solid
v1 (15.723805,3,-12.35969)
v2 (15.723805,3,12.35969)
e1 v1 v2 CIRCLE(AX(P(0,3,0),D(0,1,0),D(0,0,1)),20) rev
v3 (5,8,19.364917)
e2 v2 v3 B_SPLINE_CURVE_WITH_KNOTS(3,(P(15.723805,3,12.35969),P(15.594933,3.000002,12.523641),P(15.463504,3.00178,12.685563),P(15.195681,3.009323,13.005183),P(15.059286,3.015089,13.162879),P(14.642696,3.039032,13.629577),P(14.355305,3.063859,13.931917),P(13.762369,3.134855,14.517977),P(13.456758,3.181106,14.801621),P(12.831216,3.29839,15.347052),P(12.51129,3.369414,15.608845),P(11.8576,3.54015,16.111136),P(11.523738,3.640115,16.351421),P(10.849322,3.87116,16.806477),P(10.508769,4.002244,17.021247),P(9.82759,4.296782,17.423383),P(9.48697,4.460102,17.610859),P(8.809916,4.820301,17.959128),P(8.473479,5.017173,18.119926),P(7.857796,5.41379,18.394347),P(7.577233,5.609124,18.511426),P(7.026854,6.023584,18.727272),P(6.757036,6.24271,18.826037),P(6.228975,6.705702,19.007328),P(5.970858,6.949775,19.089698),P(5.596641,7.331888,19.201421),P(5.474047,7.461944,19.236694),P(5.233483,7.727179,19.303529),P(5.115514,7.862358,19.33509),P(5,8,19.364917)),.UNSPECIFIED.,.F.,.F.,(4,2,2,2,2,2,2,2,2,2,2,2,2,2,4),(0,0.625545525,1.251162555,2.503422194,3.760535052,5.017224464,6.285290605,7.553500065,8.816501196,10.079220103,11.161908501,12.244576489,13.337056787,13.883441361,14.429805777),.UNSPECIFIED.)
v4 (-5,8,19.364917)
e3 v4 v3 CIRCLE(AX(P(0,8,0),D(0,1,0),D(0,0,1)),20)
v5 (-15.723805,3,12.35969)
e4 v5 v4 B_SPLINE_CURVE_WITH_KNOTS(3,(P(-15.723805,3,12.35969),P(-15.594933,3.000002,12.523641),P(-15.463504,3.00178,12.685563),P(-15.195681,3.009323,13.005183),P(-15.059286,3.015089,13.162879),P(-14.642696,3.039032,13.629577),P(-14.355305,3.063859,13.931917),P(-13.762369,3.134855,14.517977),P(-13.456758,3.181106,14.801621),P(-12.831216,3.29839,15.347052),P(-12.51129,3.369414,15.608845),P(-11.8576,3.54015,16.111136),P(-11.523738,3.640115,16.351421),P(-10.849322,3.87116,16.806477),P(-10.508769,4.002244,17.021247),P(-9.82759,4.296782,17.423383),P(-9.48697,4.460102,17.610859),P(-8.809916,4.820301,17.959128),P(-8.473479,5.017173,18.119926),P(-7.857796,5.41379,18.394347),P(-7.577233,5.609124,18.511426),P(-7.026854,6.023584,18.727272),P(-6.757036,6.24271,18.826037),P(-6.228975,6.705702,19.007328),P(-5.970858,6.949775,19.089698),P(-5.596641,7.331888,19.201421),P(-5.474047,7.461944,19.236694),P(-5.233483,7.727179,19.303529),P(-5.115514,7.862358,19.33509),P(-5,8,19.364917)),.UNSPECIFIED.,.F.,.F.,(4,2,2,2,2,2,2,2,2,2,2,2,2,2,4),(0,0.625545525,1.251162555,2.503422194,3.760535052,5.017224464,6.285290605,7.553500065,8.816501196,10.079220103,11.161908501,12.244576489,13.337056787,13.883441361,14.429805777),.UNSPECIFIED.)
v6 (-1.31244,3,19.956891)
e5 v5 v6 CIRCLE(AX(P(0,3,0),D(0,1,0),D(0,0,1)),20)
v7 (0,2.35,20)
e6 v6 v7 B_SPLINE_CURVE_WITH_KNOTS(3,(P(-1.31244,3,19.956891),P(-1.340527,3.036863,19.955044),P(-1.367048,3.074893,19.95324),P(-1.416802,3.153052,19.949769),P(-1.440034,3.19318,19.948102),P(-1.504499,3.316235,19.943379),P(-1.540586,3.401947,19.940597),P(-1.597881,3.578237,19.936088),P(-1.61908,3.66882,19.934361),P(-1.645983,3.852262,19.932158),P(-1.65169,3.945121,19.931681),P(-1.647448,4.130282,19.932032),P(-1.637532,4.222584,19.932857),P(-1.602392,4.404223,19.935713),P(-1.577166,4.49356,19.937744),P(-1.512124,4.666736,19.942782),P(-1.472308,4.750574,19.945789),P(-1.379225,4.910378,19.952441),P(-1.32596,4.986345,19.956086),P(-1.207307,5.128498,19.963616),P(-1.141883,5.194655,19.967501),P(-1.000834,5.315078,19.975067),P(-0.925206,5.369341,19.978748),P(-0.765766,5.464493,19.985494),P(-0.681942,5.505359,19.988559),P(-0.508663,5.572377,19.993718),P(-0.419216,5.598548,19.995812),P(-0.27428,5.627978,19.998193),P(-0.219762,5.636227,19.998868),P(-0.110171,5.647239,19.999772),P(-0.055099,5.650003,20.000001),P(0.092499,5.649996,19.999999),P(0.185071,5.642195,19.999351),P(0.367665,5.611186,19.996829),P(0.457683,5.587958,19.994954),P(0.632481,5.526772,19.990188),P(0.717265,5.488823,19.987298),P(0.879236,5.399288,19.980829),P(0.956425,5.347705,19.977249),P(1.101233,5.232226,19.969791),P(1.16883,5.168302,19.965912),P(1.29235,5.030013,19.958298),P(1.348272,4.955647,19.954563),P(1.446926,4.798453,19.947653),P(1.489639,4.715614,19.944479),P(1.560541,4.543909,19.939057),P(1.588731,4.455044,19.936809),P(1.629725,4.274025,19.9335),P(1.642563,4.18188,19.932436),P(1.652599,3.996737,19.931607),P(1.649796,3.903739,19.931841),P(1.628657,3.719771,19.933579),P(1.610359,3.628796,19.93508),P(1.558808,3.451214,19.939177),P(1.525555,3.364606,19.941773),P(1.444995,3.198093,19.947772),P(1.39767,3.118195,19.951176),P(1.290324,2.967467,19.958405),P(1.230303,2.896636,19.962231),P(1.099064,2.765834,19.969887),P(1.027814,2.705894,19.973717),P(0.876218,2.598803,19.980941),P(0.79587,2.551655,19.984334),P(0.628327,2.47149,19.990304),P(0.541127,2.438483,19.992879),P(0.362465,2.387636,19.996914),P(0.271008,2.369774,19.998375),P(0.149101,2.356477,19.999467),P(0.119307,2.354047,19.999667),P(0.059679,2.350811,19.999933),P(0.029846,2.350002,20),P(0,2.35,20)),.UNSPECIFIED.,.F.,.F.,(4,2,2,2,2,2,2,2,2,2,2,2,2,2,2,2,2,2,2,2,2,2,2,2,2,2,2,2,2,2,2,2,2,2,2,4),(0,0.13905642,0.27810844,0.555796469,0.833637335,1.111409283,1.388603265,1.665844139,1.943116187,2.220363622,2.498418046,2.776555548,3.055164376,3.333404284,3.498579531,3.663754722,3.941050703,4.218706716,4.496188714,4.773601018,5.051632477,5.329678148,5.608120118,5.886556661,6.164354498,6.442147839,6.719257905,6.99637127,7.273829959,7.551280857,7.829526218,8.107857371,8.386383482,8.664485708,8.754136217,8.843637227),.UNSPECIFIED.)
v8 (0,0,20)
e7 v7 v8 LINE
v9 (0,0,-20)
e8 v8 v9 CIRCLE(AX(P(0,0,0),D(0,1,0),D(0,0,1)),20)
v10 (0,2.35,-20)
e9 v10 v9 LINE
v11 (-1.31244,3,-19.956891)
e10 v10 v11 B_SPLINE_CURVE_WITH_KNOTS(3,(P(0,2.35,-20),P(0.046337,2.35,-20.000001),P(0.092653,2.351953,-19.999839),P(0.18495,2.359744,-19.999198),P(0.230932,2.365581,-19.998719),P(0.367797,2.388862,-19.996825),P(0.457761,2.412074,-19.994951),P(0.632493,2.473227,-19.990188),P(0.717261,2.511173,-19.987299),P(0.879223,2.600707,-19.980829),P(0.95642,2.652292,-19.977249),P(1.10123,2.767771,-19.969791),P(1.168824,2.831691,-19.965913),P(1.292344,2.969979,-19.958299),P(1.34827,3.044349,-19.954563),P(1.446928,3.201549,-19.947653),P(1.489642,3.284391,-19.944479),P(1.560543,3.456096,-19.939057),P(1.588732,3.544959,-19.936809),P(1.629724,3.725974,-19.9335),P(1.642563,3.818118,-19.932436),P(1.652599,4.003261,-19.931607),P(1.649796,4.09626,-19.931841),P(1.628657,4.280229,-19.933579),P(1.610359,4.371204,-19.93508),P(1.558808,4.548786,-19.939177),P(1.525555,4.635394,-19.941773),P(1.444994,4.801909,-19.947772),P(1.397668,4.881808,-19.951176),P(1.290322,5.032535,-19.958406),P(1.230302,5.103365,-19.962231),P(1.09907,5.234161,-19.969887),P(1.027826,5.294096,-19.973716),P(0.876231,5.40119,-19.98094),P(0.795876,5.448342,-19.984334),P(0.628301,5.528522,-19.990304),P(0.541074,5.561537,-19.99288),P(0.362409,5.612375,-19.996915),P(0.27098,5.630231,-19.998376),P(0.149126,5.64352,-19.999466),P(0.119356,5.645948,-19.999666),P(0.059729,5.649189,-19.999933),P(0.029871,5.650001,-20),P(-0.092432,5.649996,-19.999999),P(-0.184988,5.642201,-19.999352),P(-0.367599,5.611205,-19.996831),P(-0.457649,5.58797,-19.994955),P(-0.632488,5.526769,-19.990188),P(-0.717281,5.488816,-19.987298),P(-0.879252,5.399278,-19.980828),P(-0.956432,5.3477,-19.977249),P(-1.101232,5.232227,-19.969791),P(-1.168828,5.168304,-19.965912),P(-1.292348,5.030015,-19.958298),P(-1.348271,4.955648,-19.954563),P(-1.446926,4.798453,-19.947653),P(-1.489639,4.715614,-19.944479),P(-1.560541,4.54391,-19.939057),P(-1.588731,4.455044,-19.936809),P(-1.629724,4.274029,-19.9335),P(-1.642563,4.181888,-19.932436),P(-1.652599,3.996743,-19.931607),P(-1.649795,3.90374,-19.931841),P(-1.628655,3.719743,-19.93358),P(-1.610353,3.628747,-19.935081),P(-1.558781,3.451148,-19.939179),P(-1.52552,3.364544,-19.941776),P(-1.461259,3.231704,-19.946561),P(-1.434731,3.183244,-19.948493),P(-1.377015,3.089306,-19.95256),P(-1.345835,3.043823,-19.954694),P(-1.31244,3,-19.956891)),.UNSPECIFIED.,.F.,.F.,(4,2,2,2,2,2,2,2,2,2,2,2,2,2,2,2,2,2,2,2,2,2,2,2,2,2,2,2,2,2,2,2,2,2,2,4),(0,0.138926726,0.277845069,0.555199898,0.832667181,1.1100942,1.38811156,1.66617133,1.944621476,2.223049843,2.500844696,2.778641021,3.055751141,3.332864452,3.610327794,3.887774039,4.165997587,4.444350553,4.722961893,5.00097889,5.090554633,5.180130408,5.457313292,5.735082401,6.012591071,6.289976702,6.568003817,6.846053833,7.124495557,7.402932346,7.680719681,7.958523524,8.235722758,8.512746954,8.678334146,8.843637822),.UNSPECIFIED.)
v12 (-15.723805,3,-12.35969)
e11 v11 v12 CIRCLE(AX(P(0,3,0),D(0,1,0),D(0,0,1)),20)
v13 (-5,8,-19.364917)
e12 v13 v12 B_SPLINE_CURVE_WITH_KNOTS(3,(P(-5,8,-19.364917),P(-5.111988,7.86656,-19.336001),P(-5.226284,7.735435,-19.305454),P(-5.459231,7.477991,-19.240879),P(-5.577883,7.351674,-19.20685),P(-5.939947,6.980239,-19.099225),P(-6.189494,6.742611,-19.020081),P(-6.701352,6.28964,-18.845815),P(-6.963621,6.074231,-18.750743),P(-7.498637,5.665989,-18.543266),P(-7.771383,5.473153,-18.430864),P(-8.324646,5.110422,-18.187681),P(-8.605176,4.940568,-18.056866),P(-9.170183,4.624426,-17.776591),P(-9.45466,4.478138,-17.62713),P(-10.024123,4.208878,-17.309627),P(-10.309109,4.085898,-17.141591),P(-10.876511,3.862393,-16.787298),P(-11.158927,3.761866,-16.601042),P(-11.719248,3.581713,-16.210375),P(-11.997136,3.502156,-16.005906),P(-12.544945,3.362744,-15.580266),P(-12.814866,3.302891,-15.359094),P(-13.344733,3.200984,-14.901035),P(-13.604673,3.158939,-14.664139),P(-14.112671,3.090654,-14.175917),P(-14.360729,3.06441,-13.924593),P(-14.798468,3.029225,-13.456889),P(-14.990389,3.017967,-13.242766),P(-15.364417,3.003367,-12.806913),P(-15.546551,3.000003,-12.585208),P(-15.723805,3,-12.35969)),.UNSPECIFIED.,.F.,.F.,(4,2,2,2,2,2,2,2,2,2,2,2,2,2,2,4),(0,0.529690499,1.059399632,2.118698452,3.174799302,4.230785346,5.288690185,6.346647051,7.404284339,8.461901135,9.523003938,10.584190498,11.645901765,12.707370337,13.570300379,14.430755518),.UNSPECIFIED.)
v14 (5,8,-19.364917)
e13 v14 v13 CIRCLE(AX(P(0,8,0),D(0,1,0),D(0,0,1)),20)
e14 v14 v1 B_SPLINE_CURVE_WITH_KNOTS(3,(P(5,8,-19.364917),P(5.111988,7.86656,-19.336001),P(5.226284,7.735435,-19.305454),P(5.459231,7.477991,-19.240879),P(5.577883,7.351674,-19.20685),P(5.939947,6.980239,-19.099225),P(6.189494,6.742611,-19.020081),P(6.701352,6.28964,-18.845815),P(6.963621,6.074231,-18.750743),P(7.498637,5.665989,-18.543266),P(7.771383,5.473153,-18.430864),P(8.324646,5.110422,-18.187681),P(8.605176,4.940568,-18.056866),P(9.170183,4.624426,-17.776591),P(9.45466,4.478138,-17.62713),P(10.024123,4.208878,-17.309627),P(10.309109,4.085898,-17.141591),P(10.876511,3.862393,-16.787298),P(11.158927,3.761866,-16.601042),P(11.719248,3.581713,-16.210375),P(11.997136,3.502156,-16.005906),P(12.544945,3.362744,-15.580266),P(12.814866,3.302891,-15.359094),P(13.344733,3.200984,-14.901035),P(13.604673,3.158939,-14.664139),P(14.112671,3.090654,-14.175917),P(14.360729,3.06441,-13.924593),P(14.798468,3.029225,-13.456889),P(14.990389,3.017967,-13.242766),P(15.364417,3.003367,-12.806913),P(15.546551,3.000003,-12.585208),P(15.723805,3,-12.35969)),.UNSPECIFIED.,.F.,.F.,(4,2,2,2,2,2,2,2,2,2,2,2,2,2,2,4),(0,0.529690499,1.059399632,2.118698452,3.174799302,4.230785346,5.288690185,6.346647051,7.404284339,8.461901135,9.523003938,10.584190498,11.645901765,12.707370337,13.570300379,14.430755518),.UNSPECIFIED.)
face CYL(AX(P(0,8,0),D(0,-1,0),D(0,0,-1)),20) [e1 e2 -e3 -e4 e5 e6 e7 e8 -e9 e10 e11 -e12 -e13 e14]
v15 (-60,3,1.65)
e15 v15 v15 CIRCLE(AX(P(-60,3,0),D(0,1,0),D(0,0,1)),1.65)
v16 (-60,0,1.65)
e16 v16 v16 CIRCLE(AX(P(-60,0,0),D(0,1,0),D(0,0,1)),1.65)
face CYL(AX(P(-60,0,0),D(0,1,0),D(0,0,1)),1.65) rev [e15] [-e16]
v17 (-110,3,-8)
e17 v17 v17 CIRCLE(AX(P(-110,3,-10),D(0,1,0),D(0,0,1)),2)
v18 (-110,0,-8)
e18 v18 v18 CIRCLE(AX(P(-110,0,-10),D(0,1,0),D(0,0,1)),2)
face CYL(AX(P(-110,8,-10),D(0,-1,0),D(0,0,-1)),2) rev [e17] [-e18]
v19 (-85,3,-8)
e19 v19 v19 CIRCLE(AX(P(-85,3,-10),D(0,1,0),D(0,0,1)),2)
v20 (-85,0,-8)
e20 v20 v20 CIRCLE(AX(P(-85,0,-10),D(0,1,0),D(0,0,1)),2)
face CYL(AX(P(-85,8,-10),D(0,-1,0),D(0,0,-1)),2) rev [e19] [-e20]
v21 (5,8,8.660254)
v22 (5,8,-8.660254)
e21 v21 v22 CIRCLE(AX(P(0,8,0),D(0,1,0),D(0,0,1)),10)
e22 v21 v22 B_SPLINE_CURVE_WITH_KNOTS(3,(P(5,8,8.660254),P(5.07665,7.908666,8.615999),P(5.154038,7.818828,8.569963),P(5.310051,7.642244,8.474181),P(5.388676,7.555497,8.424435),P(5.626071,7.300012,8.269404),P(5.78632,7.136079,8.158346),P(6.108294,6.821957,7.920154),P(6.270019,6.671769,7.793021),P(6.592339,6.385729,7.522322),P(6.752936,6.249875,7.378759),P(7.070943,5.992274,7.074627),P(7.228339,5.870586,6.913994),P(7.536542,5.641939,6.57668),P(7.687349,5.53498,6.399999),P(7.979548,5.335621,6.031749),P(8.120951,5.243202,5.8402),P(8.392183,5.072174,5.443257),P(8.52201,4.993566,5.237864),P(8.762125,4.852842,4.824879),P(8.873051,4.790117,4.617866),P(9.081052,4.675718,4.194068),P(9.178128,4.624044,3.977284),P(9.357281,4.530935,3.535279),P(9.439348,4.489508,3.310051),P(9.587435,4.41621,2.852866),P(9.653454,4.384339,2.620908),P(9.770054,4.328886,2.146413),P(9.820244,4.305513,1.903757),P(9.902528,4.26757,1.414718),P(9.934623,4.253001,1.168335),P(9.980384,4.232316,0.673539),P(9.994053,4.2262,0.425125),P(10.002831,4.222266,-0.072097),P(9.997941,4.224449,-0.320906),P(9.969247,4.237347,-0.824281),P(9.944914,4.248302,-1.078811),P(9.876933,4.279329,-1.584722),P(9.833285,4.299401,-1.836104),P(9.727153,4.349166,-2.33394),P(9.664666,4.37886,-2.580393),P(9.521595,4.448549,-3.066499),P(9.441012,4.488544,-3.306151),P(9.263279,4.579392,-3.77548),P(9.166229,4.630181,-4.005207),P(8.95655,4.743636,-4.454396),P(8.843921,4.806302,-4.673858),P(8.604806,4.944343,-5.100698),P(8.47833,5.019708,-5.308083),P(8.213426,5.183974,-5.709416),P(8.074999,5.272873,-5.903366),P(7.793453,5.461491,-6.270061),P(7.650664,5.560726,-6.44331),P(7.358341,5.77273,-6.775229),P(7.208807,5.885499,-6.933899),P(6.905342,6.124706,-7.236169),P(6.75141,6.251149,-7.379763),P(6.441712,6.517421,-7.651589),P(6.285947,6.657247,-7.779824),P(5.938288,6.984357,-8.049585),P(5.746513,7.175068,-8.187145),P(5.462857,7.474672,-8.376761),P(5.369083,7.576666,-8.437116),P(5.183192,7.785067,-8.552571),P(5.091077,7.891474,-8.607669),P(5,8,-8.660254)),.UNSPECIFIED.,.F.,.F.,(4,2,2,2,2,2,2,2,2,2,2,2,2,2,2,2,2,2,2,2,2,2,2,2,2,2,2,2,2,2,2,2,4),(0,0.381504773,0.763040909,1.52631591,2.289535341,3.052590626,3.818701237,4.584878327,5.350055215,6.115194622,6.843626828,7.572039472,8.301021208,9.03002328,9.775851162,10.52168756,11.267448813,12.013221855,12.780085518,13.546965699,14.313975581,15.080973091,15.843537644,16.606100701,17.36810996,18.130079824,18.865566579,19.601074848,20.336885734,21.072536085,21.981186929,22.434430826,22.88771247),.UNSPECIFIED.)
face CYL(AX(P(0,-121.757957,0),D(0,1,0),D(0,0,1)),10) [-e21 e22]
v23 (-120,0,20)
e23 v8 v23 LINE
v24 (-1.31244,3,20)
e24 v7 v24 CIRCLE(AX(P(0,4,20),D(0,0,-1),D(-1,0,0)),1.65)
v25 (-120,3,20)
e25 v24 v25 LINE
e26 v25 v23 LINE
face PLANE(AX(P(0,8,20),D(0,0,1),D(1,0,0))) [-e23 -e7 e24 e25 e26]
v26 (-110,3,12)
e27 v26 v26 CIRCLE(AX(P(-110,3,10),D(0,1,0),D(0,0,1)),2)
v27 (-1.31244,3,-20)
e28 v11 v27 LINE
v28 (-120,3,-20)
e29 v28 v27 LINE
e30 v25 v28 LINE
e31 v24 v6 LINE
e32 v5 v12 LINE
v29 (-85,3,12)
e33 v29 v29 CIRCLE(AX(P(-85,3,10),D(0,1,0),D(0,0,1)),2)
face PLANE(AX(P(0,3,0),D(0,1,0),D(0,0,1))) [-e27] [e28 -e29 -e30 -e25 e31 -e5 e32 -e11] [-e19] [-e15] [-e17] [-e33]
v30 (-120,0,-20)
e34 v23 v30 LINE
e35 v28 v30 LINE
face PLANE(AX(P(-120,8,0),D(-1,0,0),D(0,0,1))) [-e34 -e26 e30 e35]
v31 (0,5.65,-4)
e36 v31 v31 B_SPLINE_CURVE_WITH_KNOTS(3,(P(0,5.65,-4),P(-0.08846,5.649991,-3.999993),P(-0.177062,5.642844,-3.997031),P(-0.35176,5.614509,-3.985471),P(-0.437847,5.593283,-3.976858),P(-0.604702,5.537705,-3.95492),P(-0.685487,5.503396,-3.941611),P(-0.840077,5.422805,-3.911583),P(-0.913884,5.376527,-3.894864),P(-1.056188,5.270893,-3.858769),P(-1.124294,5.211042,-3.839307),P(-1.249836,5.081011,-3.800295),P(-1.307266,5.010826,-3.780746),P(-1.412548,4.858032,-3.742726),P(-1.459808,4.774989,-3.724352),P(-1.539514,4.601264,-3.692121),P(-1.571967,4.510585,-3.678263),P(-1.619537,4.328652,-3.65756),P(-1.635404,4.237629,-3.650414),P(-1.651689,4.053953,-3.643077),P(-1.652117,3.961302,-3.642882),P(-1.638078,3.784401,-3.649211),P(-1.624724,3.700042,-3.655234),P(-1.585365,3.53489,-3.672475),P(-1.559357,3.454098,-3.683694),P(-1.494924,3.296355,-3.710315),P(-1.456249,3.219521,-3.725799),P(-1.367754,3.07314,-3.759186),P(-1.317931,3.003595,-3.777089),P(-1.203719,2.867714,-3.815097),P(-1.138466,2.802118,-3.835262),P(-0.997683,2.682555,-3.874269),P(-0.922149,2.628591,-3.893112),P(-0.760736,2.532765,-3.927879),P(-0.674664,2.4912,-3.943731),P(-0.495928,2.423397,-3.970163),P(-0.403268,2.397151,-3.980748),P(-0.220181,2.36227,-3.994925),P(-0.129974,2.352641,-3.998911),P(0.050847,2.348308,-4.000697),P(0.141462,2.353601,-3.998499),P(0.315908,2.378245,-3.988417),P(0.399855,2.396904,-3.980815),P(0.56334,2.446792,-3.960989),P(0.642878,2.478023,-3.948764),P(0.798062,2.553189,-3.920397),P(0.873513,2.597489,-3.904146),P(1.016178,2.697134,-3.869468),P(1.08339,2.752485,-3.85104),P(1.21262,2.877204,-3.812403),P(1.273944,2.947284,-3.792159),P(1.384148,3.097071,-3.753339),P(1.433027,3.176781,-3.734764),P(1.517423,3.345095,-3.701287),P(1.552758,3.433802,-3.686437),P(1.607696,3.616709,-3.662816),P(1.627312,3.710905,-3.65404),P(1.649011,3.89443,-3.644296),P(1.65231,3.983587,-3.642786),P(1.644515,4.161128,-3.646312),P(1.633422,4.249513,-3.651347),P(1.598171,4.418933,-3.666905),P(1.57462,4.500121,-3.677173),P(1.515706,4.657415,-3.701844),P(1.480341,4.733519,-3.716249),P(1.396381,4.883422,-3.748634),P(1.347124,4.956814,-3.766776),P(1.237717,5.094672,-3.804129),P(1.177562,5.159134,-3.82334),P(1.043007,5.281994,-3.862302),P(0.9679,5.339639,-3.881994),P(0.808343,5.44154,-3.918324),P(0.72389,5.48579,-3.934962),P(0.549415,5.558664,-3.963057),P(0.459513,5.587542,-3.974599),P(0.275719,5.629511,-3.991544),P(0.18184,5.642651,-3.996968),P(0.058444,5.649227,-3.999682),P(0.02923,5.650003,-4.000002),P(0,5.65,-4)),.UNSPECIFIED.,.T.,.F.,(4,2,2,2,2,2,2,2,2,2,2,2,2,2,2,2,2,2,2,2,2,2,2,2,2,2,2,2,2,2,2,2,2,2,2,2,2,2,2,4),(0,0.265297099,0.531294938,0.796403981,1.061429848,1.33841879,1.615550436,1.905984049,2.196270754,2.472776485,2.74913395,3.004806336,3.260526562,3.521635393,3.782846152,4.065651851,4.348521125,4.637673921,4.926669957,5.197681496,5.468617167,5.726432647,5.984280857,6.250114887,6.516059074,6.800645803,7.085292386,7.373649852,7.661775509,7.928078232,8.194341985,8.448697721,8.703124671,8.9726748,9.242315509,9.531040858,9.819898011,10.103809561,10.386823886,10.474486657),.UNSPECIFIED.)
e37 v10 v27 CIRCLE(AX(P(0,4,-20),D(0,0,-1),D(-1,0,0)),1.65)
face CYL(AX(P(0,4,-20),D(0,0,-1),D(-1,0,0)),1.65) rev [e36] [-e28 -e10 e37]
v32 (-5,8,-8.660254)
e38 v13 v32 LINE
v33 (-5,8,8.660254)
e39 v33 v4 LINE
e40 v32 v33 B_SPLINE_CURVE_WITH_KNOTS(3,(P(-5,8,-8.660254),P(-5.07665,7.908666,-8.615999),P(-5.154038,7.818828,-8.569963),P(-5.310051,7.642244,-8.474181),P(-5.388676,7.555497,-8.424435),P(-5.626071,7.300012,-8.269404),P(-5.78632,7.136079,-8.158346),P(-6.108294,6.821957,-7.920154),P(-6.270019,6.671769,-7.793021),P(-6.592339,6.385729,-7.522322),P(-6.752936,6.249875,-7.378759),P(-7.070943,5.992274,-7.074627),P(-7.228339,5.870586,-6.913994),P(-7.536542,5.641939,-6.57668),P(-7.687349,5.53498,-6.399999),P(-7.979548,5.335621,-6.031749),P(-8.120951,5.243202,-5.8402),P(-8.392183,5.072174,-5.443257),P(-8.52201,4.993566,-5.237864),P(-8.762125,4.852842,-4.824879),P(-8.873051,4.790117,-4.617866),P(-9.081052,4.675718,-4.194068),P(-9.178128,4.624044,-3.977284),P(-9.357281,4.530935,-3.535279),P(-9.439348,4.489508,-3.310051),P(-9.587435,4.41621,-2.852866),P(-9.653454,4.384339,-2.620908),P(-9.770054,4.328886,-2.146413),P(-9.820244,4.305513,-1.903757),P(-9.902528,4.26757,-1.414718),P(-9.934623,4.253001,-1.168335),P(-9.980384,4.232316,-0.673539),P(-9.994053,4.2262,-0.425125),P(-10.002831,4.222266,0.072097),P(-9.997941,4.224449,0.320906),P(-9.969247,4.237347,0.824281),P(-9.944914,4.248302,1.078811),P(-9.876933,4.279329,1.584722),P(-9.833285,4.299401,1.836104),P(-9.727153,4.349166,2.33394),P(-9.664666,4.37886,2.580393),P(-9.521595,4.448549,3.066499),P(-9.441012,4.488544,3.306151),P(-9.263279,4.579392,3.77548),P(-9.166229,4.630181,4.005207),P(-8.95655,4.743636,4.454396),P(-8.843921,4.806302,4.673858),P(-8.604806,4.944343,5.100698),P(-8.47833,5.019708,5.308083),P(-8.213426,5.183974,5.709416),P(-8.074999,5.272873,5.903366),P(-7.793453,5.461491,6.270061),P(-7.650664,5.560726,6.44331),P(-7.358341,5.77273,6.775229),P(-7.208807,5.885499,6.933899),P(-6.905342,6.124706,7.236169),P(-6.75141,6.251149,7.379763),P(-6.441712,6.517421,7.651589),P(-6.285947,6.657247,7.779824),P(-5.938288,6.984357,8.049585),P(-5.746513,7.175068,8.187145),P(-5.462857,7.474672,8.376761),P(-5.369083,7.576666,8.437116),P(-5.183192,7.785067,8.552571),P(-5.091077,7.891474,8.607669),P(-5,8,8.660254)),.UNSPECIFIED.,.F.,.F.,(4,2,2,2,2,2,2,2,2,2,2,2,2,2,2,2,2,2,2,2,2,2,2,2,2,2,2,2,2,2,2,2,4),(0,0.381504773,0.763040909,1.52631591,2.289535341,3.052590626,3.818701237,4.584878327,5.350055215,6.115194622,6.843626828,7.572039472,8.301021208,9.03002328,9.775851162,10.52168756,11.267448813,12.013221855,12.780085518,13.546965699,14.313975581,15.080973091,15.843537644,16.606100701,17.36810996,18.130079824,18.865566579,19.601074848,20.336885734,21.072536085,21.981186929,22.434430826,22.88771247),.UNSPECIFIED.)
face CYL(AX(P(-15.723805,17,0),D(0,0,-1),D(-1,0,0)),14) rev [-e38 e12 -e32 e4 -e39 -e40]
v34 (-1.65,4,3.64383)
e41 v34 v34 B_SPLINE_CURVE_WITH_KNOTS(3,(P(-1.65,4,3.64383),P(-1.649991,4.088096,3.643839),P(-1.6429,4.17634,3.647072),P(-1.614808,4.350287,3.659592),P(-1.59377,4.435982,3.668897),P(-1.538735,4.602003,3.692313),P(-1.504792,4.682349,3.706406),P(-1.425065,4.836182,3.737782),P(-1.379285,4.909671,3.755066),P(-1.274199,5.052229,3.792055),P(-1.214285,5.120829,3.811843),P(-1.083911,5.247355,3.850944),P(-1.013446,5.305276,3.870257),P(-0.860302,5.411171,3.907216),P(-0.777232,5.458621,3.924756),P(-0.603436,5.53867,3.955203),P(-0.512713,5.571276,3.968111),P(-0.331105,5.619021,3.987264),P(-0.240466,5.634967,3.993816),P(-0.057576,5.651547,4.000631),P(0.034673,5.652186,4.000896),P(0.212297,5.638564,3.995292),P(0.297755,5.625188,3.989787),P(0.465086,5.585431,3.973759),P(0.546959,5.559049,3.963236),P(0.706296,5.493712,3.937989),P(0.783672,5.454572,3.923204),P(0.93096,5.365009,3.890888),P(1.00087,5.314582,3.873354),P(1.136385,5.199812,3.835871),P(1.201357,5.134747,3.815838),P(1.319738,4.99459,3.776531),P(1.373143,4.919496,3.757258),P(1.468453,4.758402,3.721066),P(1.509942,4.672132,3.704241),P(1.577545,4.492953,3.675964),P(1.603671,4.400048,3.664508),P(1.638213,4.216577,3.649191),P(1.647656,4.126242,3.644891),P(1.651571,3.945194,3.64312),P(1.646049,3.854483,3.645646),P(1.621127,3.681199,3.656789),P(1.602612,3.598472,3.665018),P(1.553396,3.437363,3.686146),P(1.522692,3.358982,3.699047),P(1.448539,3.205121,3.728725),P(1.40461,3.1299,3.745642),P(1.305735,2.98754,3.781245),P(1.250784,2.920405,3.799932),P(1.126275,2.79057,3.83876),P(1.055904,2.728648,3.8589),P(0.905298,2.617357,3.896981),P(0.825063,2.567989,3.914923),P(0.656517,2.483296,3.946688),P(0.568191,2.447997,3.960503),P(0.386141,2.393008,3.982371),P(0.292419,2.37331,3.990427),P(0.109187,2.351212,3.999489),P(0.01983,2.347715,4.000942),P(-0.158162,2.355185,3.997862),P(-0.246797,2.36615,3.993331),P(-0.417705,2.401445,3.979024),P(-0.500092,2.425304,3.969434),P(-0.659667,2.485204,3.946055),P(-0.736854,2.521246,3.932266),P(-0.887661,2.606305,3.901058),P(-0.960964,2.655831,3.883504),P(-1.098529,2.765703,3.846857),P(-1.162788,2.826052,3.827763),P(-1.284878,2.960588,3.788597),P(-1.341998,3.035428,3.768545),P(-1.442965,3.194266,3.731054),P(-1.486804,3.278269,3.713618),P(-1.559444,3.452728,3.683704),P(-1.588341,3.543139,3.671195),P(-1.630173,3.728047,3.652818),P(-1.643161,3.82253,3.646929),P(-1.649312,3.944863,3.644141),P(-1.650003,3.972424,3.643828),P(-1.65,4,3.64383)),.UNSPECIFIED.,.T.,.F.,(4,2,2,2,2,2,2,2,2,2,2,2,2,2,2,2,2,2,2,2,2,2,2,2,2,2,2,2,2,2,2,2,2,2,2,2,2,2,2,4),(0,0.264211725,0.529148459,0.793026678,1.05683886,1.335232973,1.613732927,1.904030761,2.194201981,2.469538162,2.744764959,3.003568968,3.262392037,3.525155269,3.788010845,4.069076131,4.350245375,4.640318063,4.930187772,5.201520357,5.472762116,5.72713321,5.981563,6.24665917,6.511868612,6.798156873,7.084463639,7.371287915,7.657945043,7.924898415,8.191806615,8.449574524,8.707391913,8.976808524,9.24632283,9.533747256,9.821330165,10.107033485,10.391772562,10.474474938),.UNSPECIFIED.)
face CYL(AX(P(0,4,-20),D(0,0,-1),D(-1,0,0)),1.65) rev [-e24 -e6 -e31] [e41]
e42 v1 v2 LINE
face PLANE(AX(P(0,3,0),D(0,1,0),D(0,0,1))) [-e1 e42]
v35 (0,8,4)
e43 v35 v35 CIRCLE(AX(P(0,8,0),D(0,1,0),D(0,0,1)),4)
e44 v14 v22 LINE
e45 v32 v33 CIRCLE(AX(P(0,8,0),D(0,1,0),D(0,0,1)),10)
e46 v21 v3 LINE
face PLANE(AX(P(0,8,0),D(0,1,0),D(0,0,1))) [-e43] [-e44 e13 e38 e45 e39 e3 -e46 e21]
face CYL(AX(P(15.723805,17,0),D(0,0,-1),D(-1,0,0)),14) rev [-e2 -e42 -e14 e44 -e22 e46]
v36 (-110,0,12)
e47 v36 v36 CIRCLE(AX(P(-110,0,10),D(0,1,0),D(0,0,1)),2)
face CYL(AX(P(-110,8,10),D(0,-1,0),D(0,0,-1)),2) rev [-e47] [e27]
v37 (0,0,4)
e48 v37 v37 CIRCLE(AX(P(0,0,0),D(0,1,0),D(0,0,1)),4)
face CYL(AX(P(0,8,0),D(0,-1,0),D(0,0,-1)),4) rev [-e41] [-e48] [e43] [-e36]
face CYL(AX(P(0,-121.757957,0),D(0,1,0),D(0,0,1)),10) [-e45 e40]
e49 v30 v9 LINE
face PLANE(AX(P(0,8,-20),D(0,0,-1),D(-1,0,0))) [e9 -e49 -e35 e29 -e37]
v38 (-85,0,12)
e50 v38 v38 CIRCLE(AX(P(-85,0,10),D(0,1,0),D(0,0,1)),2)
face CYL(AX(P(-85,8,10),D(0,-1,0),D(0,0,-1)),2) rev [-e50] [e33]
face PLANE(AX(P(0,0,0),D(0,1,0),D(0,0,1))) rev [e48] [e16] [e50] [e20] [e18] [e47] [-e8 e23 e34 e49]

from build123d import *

# Parameters (mm, degrees)
SKETCH1_R           = 2
SKETCH1_R_2         = 4
BOSS_EXTRUDE1_DEPTH = 8
CUT_EXTRUDE1_START  = -5
SKETCH4_R           = 2
CUT_EXTRUDE1_DEPTH  = 5
FILLET2_R           = 14
M4_TAPPED_HOLE1_D   = 3.3
SKETCH5_R           = 1.65
CUT_EXTRUDE2_DEPTH  = 122.757956639
CUT_EXTRUDE3_START  = -5
CUT_EXTRUDE3_DEPTH  = 5


with BuildPart() as part:
    # Sketch1 → Boss-Extrude1 (new body)
    with BuildSketch(Plane(origin=(0, 0, 0), x_dir=(1, 0, 0), z_dir=(0, 1, 0))):
        with BuildLine():
            Line((0, 20), (-120, 20))
            Line((-120, 20), (-120, -5))
            Line((-120, -5), (-120, -20))
            Line((-120, -20), (0, -20))
            ThreePointArc((0, -20), (14.142135607, -14.14213564), (20, -4.7e-08))
            ThreePointArc((20, -4.7e-08), (14.14213564, 14.142135607), (0, 20))
        make_face()
        with Locations(Location((-110, -10, 0), (0, 0, 270))):
            Circle(SKETCH1_R, mode=Mode.SUBTRACT)
        with Locations(Location((-85, -10, 0), (0, 0, 270))):
            Circle(SKETCH1_R, mode=Mode.SUBTRACT)
        with Locations(Location((-110, 10, 0), (0, 0, 270))):
            Circle(SKETCH1_R, mode=Mode.SUBTRACT)
        with Locations(Location((-85, 10, 0), (0, 0, 270))):
            Circle(SKETCH1_R, mode=Mode.SUBTRACT)
        with Locations(Location((0, 0, 0), (0, 0, 270))):
            Circle(SKETCH1_R_2, mode=Mode.SUBTRACT)
    extrude(amount=BOSS_EXTRUDE1_DEPTH)

    # Sketch4 → Cut-Extrude1 (cut)
    # profile 1 of 2: a face of its own
    with BuildSketch(Plane(origin=(0, 8, 0), x_dir=(1, 0, 0), z_dir=(0, 1, 0)).offset(CUT_EXTRUDE1_START)):
        with BuildLine():
            Line((-5, 8.660254038), (-5, 20))
            Line((-5, 20), (-120, 20))
            Line((-120, 20), (-120, -20))
            Line((-120, -20), (-5, -20))
            Line((-5, -20), (-5, -8.660254038))
            ThreePointArc((-5, -8.660254038), (-10, 0), (-5, 8.660254038))
        make_face()
        with Locations(Location((-110, -10, 0), (0, 0, 270))):
            Circle(SKETCH4_R, mode=Mode.SUBTRACT)
        with Locations(Location((-85, -10, 0), (0, 0, 270))):
            Circle(SKETCH4_R, mode=Mode.SUBTRACT)
        with Locations(Location((-110, 10, 0), (0, 0, 270))):
            Circle(SKETCH4_R, mode=Mode.SUBTRACT)
        with Locations(Location((-85, 10, 0), (0, 0, 270))):
            Circle(SKETCH4_R, mode=Mode.SUBTRACT)
    # profile 2 of 2: a face of its own
    with BuildSketch(Plane(origin=(0, 8, 0), x_dir=(1, 0, 0), z_dir=(0, 1, 0)).offset(CUT_EXTRUDE1_START)):
        with BuildLine():
            ThreePointArc((5, -19.364916731), (20, 0), (5, 19.364916731))
            Line((5, 19.364916731), (5, 8.660254038))
            ThreePointArc((5, 8.660254038), (10, 0), (5, -8.660254038))
            Line((5, -8.660254038), (5, -19.364916731))
        make_face()
    extrude(amount=CUT_EXTRUDE1_DEPTH, mode=Mode.SUBTRACT)

    # Fillet2
    # the kernel refuses this fillet: 14 mm, written as the material it adds along each edge
    with BuildSketch(Plane(origin=(-5, 3, 20), x_dir=(-1, 0, 0), z_dir=(0, 0, -1)), Plane(origin=(-5, 3, 18.149259199), x_dir=(-1, 0, 0), z_dir=(0, 0, -1))) as fillet2_piece_1:
        with BuildLine():
            CenterArc((10.723805295, 14), FILLET2_R, 220.005200885, 49.994799115)
            Line((0, 5), (0, 0))
            Line((0, 0), (10.723805295, 0))
        make_face()
    extrude(amount=38.149259199)
    with BuildSketch(Plane(origin=(5, 3, -46.174429968), x_dir=(0, 1, 0), z_dir=(0, 0, 1))) as fillet2_piece_2_section:
        with BuildLine():
            CenterArc((14, -10.723805295), FILLET2_R, 130.005200885, 49.994799115)
            Line((0, -10.723805295), (0, 0))
            Line((0, 0), (5, 0))
        make_face()
    fillet2_piece_2 = extrude(amount=64.323689167, mode=Mode.PRIVATE)
    fillet2_piece_2 = fillet2_piece_2 & Plane(origin=(0, 3, 0), x_dir=(0, 0, 1), z_dir=(0, -1, 0)) * Cylinder(20, 172, mode=Mode.PRIVATE)
    add(fillet2_piece_2)
    with BuildSketch(Plane(origin=(5, 3, -18.149259199), x_dir=(0, 1, 0), z_dir=(0, 0, 1))) as fillet2_piece_3_section:
        with BuildLine():
            CenterArc((14, -10.723805295), FILLET2_R, 130.005200885, 49.994799115)
            Line((0, -10.723805295), (0, 0))
            Line((0, 0), (5, 0))
        make_face()
    fillet2_piece_3 = extrude(amount=64.323689167, mode=Mode.PRIVATE)
    fillet2_piece_3 = fillet2_piece_3 & Plane(origin=(0, 3, 0), x_dir=(0, 0, 1), z_dir=(0, -1, 0)) * Cylinder(20, 172, mode=Mode.PRIVATE)
    add(fillet2_piece_3)

    # M4 Tapped Hole1 (through all)
    with Locations(Plane(origin=(0, 0, -20), x_dir=(-1, 0, 0), z_dir=(0, 0, -1))):
        with Locations((0, 4)):
            Hole(M4_TAPPED_HOLE1_D / 2)

    # Sketch5 → Cut-Extrude2 (cut, through all)
    with BuildSketch(Plane(origin=(0, 3, 0), x_dir=(1, 0, 0), z_dir=(0, 1, 0))):
        with Locations(Location((-60, 0, 0), (0, 0, 270))):
            Circle(SKETCH5_R)
    extrude(amount=-CUT_EXTRUDE2_DEPTH, mode=Mode.SUBTRACT)

    # Sketch6 → Cut-Extrude3 (cut)
    with BuildSketch(Plane(origin=(0, 8, 0), x_dir=(1, 0, 0), z_dir=(0, 1, 0)).offset(CUT_EXTRUDE3_START)):
        with BuildLine():
            Line((-120, -20), (0, -20))
            ThreePointArc((0, -20), (-20, 0), (0, 20))
            Line((0, 20), (-120, 20))
            Line((-120, 20), (-120, -20))
        make_face()
    extrude(amount=CUT_EXTRUDE3_DEPTH, mode=Mode.SUBTRACT)


solid = part.part
